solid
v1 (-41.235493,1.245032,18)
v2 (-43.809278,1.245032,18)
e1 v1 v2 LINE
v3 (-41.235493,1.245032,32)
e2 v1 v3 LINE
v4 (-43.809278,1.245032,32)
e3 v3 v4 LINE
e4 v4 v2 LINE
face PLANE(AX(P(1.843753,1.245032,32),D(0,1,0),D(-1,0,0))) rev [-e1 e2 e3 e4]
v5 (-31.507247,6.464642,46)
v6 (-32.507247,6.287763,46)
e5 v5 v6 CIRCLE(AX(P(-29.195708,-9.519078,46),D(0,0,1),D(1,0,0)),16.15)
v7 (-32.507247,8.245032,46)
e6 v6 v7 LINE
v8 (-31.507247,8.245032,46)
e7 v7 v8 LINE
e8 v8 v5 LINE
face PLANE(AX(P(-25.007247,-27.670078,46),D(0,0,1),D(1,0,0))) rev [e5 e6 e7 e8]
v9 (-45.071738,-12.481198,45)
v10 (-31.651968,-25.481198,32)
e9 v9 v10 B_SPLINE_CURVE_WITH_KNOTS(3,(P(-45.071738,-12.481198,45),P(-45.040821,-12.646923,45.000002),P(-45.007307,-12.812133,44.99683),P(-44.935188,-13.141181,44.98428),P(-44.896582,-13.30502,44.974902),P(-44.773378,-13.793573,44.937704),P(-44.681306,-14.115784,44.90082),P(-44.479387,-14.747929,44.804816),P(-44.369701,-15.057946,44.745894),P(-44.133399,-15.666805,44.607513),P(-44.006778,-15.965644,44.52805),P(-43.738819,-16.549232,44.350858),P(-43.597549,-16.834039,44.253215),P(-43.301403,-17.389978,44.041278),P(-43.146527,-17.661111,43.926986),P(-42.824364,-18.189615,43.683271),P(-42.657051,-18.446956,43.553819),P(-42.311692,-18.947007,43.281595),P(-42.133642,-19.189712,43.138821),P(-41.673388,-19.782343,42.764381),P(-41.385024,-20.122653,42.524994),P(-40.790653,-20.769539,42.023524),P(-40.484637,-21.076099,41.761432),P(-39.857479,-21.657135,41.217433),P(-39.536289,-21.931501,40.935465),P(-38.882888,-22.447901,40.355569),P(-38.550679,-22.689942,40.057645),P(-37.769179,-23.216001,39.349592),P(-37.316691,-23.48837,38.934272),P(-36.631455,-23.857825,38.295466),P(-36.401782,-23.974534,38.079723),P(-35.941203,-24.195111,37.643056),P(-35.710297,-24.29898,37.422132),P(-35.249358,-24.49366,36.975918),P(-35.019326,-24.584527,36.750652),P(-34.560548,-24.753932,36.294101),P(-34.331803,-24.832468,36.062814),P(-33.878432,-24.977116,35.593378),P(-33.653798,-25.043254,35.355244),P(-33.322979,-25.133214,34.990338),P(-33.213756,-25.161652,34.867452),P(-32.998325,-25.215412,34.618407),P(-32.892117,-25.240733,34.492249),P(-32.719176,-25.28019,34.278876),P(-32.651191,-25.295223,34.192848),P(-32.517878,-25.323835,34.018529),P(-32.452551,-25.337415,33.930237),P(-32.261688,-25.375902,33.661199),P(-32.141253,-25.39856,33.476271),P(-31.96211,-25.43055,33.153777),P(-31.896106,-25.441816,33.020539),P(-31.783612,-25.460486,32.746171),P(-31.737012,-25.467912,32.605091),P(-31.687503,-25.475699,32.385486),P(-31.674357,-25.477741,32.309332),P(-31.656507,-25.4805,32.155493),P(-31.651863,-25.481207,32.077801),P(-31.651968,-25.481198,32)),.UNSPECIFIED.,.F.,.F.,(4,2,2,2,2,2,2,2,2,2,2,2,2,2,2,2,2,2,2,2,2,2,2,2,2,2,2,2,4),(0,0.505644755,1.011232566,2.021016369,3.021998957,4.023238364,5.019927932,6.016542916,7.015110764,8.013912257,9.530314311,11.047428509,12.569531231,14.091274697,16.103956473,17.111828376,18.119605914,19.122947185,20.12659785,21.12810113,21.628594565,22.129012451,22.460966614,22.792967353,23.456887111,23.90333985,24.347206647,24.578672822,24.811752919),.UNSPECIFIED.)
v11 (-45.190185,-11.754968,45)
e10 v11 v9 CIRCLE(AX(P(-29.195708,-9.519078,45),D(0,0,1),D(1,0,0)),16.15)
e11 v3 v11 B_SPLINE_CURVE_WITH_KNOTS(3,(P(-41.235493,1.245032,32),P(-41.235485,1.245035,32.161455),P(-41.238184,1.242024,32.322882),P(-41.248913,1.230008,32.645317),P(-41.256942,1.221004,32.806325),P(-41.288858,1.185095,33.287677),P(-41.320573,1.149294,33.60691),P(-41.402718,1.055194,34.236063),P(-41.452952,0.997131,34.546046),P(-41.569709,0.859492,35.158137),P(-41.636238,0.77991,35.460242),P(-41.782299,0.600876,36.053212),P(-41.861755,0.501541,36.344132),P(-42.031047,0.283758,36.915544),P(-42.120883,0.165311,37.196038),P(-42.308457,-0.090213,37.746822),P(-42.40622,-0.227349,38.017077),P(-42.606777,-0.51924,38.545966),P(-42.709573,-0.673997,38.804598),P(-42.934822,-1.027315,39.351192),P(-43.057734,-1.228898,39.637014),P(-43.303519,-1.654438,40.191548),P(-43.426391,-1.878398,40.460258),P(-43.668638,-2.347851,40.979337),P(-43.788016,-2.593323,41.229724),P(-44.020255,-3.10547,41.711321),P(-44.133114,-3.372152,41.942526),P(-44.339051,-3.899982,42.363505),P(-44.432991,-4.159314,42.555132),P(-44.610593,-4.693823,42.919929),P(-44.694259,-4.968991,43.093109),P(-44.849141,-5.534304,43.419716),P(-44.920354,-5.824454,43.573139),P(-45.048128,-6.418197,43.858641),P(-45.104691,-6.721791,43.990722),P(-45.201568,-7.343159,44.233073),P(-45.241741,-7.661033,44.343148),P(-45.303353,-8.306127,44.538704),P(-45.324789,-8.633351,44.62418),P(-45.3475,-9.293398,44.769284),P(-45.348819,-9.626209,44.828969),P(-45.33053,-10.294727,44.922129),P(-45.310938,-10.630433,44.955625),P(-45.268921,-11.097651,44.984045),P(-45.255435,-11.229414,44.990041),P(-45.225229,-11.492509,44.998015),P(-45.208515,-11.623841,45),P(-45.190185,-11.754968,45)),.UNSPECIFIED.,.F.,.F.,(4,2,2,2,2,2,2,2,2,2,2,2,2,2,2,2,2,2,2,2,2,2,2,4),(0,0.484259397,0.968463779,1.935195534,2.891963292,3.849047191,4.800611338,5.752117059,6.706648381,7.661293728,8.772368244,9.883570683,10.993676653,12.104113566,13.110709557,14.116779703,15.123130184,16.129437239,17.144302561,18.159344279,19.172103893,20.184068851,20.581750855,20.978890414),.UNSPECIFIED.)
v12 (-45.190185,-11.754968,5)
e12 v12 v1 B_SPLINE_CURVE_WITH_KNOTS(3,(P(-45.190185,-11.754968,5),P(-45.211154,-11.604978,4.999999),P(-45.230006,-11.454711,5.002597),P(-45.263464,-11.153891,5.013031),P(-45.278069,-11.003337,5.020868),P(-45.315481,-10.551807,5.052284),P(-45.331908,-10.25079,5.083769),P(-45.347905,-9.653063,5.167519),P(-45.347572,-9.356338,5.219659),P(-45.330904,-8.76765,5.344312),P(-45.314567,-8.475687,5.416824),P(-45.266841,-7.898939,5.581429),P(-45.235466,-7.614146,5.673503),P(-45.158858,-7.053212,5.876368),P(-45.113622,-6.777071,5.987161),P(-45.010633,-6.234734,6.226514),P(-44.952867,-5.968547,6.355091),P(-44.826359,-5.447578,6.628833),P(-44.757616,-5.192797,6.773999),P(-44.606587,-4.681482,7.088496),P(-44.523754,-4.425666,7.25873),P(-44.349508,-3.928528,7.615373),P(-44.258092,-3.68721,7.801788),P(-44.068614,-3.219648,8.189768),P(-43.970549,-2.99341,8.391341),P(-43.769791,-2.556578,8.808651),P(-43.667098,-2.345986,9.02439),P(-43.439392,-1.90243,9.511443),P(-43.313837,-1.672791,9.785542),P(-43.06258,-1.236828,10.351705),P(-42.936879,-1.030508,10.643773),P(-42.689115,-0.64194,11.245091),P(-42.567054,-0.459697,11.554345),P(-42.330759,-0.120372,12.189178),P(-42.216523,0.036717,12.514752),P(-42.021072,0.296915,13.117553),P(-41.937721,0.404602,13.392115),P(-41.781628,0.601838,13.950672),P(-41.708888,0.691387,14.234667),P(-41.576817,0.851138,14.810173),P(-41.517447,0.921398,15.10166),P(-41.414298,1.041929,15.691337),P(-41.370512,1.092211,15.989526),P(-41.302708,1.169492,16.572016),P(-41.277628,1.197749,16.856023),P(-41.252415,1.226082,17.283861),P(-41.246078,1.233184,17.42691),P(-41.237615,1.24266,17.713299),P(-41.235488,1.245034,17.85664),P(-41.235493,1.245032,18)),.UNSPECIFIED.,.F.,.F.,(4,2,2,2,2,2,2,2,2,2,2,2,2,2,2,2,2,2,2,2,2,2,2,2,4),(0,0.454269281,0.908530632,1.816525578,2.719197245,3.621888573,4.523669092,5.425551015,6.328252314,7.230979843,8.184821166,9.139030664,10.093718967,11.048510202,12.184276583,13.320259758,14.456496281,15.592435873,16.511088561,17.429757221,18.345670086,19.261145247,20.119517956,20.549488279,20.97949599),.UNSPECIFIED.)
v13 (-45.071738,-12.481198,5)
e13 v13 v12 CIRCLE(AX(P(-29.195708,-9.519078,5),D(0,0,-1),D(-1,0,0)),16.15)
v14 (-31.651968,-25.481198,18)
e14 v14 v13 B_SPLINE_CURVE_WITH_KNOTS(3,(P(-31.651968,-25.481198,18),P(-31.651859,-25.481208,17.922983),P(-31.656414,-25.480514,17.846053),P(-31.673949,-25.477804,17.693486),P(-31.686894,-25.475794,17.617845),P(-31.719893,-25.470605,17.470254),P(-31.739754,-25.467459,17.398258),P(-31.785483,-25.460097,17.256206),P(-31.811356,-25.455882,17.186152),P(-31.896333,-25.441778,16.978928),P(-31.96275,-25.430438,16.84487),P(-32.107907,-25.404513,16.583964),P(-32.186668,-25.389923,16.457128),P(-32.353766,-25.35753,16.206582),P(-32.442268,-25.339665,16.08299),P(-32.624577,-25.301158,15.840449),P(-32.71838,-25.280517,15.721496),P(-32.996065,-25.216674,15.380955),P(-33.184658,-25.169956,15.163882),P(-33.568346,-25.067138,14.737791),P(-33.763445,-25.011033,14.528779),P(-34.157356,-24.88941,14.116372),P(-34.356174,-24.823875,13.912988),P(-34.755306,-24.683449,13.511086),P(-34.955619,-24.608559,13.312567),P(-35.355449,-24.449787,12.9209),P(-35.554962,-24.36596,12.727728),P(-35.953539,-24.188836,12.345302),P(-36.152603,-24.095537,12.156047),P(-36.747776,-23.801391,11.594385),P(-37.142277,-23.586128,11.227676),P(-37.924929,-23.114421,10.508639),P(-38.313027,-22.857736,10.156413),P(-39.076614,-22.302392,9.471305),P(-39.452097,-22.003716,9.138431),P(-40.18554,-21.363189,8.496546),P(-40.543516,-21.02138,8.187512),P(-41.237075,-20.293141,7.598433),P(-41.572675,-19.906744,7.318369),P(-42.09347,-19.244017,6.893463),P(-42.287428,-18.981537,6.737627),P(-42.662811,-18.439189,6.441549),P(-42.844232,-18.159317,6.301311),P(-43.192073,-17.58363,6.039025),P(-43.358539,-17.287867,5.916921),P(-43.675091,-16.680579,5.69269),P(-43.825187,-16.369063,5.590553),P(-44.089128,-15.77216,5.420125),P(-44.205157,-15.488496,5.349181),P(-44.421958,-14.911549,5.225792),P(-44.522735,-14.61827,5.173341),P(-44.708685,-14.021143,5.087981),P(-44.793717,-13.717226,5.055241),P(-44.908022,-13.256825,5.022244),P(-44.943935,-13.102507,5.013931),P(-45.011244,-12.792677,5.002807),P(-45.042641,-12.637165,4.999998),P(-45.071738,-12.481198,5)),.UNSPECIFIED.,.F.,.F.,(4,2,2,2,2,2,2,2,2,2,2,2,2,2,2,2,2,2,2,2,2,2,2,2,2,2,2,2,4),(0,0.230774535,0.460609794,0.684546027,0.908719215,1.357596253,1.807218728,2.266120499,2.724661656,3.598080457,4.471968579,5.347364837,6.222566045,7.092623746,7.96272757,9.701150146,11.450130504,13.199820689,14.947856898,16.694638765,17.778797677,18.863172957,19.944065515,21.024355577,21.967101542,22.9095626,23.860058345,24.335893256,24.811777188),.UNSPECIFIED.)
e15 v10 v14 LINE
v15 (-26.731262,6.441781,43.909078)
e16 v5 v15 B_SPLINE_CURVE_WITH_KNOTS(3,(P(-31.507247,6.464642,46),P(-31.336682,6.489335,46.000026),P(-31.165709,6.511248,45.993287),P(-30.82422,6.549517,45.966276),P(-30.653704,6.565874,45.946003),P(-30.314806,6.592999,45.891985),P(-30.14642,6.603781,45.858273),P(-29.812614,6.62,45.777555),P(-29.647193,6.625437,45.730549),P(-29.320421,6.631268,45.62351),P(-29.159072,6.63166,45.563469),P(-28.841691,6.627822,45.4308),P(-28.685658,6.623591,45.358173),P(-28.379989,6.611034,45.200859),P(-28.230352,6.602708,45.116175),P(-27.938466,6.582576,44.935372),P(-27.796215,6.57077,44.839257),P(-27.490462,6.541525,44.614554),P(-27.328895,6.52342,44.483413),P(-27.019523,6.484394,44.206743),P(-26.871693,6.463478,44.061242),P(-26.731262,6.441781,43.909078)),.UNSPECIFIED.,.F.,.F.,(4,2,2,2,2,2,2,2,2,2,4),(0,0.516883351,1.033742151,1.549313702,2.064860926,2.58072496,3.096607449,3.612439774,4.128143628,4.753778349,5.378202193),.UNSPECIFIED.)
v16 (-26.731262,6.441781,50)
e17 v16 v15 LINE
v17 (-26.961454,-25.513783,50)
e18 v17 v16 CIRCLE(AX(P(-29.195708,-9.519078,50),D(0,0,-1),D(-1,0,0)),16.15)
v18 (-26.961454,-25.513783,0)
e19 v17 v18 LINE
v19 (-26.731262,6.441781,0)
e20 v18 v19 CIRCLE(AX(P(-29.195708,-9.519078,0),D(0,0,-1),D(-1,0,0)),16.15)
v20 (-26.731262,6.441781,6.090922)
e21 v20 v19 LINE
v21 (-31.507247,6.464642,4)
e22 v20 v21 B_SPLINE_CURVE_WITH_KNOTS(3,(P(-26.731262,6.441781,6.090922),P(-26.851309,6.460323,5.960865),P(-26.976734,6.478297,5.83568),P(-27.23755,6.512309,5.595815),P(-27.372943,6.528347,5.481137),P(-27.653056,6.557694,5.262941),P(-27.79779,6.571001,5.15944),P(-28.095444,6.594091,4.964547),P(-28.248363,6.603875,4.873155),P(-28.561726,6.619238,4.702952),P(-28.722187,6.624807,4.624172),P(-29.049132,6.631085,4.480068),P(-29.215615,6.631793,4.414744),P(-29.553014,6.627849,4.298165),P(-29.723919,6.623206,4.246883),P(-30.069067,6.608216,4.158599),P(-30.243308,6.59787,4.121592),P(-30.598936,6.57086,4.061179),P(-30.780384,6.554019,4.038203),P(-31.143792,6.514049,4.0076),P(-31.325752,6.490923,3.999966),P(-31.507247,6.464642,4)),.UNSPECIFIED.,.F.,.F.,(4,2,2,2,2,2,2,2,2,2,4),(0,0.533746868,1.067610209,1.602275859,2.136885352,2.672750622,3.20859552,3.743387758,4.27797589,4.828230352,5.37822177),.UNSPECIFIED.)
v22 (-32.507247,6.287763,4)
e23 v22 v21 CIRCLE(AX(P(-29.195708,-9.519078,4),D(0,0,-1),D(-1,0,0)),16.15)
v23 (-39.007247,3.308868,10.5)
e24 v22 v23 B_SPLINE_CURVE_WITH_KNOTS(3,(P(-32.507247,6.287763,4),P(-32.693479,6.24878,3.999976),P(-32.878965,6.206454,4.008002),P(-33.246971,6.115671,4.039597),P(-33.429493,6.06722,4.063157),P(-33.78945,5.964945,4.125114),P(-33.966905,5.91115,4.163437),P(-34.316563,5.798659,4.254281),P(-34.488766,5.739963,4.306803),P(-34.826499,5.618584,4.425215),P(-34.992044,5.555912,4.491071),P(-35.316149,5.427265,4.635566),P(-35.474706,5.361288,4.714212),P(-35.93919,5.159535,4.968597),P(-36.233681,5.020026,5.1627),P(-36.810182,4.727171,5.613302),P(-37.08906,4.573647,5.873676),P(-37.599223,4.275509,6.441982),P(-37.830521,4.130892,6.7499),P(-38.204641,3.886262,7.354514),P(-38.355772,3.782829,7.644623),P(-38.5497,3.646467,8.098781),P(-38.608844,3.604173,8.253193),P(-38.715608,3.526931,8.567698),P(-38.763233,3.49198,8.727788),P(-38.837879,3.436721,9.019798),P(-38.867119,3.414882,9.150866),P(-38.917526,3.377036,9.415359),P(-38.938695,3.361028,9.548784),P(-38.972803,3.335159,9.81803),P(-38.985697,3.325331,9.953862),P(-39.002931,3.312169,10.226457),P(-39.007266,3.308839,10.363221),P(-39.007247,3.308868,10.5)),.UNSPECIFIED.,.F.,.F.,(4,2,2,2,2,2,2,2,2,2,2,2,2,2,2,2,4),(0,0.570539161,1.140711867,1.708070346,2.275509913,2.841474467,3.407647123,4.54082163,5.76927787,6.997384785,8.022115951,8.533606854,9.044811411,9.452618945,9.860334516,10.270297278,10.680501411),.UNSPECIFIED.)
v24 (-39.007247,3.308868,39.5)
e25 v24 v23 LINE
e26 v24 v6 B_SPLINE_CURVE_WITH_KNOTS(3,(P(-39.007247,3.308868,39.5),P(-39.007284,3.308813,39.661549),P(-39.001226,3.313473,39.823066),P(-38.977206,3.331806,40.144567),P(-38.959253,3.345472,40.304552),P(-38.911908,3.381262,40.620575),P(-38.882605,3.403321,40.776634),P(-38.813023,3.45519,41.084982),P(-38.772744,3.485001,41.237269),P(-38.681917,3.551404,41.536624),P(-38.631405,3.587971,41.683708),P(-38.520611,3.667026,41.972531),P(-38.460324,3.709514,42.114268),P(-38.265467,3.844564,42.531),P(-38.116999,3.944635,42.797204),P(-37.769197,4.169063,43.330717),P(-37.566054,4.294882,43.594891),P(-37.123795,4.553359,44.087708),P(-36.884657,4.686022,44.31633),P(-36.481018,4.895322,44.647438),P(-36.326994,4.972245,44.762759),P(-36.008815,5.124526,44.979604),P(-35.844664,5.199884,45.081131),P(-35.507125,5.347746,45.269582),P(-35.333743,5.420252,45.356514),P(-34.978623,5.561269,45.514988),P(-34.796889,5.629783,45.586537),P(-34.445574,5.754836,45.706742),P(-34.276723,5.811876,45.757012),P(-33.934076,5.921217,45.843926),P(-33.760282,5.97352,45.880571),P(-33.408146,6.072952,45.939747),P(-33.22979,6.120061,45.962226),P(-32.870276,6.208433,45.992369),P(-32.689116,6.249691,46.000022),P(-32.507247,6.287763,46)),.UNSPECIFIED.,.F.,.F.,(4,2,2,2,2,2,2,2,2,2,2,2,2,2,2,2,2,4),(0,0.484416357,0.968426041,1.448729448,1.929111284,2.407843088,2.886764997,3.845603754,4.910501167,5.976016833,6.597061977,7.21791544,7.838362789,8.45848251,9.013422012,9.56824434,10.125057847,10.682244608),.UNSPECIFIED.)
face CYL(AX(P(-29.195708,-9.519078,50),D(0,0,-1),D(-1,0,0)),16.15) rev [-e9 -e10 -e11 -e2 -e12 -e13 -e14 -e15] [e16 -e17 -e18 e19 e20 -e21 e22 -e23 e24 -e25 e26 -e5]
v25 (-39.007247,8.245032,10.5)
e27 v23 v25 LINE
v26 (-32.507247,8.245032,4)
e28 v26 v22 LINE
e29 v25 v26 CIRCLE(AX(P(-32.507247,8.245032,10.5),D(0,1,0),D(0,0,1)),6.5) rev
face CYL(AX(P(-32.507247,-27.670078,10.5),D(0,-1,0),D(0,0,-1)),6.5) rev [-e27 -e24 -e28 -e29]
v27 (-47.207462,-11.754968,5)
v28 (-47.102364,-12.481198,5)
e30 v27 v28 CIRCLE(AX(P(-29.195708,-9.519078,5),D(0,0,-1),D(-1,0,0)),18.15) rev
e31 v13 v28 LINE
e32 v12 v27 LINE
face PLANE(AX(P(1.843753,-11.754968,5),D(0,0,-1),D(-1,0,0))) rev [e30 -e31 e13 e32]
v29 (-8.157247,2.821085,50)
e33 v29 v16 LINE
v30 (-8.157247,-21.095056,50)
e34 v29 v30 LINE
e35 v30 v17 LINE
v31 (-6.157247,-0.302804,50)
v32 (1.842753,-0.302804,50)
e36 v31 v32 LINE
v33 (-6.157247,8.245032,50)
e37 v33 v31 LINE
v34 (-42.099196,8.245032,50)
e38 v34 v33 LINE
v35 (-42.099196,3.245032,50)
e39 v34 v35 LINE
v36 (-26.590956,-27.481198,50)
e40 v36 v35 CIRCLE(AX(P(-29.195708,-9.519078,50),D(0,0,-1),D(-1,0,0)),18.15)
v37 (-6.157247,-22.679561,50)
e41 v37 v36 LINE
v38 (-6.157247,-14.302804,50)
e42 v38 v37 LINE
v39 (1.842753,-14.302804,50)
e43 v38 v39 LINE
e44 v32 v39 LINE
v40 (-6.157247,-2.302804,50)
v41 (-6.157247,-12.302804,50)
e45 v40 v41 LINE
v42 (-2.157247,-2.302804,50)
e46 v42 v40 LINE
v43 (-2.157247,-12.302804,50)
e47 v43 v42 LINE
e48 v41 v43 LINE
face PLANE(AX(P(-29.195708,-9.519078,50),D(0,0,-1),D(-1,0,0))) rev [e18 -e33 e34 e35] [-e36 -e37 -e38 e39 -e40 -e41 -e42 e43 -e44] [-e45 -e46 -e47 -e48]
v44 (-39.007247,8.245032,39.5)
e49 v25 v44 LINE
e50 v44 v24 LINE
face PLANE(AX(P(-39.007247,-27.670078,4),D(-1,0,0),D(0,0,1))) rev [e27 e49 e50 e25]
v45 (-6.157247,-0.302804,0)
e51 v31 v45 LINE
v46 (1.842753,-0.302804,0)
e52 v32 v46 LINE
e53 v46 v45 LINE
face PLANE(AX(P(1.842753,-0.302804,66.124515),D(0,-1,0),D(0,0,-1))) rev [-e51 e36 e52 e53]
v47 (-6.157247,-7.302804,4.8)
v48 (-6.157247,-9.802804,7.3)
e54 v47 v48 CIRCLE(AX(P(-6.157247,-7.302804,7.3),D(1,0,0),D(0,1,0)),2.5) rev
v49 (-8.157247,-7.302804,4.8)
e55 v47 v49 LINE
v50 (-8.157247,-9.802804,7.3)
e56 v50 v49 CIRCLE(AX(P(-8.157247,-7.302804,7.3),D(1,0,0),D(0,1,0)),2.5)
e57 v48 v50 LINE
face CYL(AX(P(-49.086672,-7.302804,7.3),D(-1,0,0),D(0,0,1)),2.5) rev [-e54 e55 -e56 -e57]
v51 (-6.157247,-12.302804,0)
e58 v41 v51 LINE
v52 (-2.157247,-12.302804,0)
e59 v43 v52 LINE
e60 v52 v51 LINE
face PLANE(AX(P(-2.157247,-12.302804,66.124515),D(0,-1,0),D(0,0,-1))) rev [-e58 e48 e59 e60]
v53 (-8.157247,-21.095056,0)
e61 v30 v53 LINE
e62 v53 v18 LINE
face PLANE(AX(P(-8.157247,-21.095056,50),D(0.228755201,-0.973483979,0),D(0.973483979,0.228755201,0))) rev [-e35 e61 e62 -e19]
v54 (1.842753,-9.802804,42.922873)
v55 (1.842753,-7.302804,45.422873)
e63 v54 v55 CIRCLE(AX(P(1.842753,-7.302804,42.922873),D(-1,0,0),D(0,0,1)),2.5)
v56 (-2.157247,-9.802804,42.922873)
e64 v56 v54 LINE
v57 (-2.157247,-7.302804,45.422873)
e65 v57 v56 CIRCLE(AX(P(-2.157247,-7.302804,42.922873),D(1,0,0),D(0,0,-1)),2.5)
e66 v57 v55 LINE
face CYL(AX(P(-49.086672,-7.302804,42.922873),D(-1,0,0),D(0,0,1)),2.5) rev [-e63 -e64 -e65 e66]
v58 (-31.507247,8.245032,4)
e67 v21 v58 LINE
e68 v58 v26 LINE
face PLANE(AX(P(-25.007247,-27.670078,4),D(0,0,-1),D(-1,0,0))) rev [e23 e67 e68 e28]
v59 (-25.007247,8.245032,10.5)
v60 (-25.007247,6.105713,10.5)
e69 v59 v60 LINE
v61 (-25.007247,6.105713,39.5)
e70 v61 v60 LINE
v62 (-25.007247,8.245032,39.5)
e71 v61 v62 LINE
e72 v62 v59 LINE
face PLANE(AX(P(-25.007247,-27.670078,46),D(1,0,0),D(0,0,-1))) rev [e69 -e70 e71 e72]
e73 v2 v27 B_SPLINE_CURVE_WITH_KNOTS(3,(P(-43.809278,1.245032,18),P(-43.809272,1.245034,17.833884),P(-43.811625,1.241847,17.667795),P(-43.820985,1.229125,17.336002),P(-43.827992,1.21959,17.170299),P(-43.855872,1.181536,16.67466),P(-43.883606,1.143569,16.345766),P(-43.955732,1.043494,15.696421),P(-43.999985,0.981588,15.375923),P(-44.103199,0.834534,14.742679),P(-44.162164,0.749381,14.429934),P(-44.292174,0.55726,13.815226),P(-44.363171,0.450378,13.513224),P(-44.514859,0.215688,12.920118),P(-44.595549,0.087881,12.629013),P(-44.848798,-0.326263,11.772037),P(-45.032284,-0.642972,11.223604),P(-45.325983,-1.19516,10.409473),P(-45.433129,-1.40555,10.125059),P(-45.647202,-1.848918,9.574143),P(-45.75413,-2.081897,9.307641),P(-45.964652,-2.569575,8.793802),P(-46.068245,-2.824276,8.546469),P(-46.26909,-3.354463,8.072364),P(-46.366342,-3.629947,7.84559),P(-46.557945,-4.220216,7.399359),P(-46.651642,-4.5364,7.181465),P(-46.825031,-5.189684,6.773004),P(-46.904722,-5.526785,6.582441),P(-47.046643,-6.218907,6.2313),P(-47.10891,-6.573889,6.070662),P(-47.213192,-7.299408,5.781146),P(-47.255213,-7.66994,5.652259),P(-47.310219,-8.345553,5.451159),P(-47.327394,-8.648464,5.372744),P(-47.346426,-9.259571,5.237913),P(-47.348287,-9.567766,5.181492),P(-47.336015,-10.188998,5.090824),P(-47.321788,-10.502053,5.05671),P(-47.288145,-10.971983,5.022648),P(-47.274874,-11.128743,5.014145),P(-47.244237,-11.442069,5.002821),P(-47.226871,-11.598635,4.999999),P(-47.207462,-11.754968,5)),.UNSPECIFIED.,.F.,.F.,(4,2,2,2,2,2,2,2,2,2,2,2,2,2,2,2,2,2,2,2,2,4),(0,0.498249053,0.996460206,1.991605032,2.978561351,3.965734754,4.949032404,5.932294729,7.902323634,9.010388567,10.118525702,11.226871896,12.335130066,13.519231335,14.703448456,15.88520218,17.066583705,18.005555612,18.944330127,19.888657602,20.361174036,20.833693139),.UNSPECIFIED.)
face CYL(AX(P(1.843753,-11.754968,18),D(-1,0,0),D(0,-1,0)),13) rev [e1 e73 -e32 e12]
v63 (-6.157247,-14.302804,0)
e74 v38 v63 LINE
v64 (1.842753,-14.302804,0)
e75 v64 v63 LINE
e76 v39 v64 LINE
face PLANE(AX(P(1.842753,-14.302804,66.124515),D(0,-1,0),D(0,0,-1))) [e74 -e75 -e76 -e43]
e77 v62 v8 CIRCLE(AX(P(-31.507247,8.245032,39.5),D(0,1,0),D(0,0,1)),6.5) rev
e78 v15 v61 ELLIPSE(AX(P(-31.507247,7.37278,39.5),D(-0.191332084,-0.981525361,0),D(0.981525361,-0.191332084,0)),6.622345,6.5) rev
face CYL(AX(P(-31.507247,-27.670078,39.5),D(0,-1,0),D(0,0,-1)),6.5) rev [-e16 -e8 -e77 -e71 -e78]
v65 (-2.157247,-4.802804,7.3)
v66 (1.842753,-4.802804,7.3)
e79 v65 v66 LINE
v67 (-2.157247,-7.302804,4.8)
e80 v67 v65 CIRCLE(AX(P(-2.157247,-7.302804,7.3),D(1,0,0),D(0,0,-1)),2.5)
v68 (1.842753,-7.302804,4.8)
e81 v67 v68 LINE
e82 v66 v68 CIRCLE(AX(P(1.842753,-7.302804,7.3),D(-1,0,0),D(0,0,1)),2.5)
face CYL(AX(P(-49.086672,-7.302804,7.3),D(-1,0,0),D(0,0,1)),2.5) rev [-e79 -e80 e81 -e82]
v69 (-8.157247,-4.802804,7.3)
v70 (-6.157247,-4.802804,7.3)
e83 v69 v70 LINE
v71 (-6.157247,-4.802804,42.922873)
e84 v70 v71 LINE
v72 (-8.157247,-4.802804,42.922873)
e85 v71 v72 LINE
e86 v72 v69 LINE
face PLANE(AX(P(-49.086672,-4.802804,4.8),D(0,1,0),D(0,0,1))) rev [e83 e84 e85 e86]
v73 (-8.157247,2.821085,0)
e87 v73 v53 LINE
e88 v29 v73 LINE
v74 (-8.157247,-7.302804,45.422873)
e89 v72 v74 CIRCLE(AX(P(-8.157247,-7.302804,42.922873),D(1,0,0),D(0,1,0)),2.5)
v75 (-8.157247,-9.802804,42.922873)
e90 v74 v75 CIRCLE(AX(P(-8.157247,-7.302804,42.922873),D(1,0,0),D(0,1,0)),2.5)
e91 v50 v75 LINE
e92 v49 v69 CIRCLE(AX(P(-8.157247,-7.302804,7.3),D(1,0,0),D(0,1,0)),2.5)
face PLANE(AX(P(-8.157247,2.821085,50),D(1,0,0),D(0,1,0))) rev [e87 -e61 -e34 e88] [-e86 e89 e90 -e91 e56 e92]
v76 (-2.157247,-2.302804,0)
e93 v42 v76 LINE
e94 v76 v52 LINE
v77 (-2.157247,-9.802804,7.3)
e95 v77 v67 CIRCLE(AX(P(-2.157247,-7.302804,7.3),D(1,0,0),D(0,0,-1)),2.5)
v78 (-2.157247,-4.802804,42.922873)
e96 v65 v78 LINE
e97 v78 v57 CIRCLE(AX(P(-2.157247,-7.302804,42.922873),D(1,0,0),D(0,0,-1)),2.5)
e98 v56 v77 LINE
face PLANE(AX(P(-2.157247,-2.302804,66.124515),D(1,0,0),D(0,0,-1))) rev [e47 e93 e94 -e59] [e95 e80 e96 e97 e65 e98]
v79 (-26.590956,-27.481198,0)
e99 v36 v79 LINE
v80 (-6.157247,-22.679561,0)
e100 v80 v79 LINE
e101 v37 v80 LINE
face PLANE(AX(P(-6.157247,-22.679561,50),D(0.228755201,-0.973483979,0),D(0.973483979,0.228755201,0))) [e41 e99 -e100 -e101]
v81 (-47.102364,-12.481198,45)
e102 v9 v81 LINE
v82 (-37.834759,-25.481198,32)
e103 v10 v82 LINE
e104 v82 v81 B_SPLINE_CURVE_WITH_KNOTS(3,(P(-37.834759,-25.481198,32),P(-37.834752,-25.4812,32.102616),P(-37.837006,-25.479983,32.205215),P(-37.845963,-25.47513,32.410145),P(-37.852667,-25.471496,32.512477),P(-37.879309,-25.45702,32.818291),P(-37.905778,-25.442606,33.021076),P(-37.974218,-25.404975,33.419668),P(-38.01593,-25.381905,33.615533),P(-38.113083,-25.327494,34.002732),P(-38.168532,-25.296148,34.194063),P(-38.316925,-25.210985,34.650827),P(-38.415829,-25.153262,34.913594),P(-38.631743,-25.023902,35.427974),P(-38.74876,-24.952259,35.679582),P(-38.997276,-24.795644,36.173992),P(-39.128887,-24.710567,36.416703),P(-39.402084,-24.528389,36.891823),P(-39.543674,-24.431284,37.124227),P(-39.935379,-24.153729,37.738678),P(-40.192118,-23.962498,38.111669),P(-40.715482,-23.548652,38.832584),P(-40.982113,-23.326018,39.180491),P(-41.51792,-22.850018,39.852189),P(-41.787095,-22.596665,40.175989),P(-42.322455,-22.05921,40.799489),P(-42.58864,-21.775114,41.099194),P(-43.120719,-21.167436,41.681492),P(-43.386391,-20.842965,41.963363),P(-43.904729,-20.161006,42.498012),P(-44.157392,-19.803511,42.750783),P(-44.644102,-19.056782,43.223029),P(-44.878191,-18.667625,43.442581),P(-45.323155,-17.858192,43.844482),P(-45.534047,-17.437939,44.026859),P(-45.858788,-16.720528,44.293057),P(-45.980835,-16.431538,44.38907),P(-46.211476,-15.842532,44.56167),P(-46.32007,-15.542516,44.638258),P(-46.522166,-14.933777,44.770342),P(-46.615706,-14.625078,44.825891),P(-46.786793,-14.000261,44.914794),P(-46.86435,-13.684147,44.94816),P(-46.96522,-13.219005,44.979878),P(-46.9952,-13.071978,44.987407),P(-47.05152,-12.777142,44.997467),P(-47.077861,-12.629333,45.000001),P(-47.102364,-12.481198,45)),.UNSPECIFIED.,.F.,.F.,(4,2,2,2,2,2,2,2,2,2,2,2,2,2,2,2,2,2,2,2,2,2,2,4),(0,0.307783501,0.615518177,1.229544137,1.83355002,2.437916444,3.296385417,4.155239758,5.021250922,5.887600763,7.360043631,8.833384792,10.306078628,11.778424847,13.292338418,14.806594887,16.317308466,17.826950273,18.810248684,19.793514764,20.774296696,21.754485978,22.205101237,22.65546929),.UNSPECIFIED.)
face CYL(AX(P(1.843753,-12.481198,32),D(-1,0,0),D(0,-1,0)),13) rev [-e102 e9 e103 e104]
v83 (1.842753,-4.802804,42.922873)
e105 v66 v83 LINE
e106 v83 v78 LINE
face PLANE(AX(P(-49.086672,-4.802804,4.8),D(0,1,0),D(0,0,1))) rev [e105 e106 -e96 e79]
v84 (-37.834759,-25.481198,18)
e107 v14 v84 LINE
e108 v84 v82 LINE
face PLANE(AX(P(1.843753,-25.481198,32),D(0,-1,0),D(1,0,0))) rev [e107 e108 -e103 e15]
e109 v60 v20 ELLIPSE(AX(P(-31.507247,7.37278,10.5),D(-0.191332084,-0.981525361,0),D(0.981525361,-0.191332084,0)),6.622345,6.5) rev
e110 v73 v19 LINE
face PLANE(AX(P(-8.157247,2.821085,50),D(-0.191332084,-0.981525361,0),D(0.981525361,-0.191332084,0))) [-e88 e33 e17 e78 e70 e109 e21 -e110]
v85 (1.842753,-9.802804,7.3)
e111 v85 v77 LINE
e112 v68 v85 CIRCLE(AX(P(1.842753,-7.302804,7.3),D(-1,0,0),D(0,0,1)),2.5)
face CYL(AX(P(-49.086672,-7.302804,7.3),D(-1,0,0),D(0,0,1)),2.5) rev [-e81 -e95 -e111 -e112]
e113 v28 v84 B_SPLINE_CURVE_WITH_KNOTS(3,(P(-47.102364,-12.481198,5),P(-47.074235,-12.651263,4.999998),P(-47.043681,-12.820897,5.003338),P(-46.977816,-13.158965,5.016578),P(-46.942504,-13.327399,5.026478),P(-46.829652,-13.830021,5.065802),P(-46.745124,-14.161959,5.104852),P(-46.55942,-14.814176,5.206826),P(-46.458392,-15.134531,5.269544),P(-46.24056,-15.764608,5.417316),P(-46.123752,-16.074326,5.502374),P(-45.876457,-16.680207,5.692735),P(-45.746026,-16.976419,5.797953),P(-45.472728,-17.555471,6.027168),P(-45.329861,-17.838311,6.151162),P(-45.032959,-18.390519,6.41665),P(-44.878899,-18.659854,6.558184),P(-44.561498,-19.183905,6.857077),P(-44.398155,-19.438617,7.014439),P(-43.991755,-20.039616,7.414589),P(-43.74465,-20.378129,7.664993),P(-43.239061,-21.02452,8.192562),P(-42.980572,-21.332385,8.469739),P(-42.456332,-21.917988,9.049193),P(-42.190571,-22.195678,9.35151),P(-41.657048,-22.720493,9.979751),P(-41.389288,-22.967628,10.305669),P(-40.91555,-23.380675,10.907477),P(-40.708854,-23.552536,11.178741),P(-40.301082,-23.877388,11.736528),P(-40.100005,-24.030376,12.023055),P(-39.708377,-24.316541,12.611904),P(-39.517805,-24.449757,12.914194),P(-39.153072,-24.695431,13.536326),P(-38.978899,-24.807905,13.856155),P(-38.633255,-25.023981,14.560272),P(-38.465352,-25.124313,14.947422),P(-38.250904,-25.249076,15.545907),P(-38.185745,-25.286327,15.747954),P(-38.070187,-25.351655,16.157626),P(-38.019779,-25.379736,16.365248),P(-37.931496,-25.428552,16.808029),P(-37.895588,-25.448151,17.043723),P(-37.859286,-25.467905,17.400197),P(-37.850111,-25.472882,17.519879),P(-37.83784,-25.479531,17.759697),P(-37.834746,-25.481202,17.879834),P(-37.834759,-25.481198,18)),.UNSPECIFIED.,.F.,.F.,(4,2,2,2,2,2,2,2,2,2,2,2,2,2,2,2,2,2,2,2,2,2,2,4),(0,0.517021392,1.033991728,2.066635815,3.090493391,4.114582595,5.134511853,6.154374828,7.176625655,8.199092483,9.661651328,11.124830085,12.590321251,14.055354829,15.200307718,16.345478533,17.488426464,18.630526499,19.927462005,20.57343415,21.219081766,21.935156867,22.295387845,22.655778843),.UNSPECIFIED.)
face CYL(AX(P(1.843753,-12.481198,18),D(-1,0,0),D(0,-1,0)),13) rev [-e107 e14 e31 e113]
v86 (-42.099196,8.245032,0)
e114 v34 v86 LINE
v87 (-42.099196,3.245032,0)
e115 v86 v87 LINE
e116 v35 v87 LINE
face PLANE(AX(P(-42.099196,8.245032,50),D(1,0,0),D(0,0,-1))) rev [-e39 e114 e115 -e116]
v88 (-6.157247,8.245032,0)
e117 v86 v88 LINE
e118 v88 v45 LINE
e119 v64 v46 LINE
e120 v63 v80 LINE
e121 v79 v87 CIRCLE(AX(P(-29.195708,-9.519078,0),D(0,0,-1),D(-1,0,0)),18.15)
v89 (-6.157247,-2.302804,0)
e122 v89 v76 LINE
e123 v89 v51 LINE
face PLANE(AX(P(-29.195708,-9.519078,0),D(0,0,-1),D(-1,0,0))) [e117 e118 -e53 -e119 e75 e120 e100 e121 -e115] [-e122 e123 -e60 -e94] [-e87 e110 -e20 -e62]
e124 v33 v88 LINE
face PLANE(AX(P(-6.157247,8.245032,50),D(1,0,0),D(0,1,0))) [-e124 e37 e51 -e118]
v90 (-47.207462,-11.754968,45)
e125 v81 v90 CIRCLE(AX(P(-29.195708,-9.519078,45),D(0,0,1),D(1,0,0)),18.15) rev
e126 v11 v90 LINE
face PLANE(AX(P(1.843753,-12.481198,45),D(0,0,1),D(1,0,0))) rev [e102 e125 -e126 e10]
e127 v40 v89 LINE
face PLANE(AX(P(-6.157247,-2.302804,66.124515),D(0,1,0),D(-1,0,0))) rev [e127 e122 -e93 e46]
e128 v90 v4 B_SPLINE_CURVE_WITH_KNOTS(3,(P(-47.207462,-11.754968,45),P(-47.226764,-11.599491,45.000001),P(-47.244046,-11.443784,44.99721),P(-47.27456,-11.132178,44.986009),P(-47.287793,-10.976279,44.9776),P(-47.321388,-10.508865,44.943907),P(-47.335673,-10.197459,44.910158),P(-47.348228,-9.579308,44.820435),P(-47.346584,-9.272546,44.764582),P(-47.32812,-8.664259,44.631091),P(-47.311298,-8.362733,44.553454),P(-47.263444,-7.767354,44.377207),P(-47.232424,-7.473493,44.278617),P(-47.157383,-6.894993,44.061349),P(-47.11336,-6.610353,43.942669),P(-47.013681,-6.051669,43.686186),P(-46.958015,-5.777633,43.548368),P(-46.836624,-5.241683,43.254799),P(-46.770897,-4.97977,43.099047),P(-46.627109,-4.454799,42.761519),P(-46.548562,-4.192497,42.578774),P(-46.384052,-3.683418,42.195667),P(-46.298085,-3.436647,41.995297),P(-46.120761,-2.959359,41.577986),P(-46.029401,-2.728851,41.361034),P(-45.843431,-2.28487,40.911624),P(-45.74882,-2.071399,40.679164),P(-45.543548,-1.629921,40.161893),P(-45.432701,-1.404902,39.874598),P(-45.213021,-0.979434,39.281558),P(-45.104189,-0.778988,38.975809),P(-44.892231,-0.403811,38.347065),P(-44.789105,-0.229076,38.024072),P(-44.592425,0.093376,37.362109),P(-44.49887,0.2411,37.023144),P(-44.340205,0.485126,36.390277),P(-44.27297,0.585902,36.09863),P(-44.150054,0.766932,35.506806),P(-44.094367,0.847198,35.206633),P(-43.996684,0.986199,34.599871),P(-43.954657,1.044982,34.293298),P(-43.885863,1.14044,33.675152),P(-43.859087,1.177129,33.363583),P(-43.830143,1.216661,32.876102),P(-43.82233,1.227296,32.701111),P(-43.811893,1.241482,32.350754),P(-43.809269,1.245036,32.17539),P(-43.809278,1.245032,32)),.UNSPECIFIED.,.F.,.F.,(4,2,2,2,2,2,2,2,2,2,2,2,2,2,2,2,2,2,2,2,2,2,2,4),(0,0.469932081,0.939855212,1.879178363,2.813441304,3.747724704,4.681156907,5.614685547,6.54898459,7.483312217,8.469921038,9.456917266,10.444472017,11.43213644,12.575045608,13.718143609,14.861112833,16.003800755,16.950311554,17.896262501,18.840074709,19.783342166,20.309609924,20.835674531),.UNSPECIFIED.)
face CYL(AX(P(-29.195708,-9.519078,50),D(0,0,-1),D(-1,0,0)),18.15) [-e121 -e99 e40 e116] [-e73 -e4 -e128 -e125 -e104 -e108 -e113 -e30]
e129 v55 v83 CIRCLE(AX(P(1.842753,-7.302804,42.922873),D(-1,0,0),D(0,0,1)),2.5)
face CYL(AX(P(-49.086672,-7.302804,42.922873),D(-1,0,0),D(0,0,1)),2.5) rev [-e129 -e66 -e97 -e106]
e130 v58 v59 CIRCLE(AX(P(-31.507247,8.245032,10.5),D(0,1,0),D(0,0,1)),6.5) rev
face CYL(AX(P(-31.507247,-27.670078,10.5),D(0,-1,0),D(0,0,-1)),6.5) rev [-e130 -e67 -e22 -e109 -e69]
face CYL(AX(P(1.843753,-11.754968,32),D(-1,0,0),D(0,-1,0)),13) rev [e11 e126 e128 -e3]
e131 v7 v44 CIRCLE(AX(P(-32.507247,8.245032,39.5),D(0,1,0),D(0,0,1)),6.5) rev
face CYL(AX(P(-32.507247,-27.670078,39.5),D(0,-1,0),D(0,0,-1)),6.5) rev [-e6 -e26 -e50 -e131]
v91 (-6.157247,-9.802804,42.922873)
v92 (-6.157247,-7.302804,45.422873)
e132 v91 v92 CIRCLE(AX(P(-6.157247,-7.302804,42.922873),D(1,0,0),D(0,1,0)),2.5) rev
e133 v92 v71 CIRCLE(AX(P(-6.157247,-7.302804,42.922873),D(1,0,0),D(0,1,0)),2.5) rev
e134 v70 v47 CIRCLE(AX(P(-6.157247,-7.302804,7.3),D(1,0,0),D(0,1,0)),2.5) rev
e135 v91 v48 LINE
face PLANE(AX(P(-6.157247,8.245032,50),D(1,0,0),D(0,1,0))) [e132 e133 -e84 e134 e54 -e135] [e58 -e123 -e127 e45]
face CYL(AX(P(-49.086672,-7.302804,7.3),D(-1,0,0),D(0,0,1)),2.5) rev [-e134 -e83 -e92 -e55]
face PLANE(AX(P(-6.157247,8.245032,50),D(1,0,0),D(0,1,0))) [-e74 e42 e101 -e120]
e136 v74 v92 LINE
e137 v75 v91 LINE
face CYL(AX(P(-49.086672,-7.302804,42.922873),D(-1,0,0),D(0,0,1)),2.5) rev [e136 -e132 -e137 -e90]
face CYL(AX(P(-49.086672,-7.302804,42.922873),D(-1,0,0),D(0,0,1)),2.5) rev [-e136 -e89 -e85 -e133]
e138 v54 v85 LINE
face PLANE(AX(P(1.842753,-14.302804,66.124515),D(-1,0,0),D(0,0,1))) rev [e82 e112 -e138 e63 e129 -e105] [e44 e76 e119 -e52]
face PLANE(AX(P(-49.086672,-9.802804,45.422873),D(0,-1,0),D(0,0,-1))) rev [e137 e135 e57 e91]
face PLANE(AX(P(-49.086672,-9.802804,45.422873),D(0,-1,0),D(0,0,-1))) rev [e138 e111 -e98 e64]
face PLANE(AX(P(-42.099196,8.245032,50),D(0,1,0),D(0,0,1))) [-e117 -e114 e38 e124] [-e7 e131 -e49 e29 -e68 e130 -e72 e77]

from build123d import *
from OCP.BRepAlgoAPI import BRepAlgoAPI_Cut
from OCP.TopTools import TopTools_ListOfShape

# Parameters (mm, degrees)
SALIENTE_EXTRUIR1_DEPTH     = 50
SALIENTE_EXTRUIR2_DEPTH     = 50
CORTAR_EXTRUIR12_REACH      = 77.399
REDONDEO1_R                 = 2.5
CORTAR_EXTRUIR17_REACH      = 77.931
CORTAR_EXTRUIR17_END_RADIUS = 16.15
CORTAR_EXTRUIR19_REACH      = 79.662
CROQUIS18_W                 = 7
CROQUIS18_H                 = 42
CORTAR_EXTRUIR22_REACH      = 79.662
CORTAR_EXTRUIR22_END_RADIUS = 16.15
CROQUIS22_W                 = 7
CROQUIS22_H                 = 42
REDONDEO10_START            = 3.308867588
REDONDEO10_DEPTH            = 4.936164621
REDONDEO10_START_2          = 6.105712769
REDONDEO10_2_DEPTH          = 2.13931944
REDONDEO10_START_3          = 4
REDONDEO10_3_DEPTH          = 42


with BuildPart() as part:
    # Croquis3 → Saliente-Extruir1 (new body)
    with BuildSketch(Plane.XY):
        with BuildLine():
            Line((-42.099195701, 8.245032209), (-6.157247249, 8.245032209))
            Line((-6.157247249, 8.245032209), (-6.157247249, -22.679560551))
            Line((-6.157247249, -22.679560551), (-26.590955846, -27.481197975))
            ThreePointArc((-26.590955846, -27.481197975), (-45.398833914, -17.697170572), (-42.099195701, 3.245032209))
            Line((-42.099195701, 3.245032209), (-42.099195701, 8.245032209))
        make_face()
        with BuildLine():
            Line((-8.157247249, 2.82108494), (-26.731262437, 6.441781026))
            ThreePointArc((-26.731262437, 6.441781026), (-45.345288804, -9.402744466), (-26.961453667, -25.513783269))
            Line((-26.961453667, -25.513783269), (-8.157247249, -21.095056202))
            Line((-8.157247249, -21.095056202), (-8.157247249, 2.82108494))
        make_face(mode=Mode.SUBTRACT)
    extrude(amount=SALIENTE_EXTRUIR1_DEPTH)

    # Croquis11 → Saliente-Extruir2 (add)
    with BuildSketch(Plane(origin=(0, 0, 0), x_dir=(-1, 0, 0), z_dir=(0, 0, -1))):
        Polygon((-1.842752751, -14.302804028), (-1.842752751, -0.302804028), (6.157247249, -0.302804028), (6.157247249, -2.302804028), (2.157247249, -2.302804028), (2.157247249, -12.302804028), (6.157247249, -12.302804028), (6.157247249, -14.302804028), align=None)
    extrude(amount=-SALIENTE_EXTRUIR2_DEPTH)

    # Cortar-Extruir12: up to this face of the body (flat: up to its plane)
    cortar_extruir12_end = Plane(part.part.faces().sort_by_distance((-8.157247249, -9.136985631, 25))[0])
    # Croquis12 → Cortar-Extruir12 (cut, up to the picked face)
    with BuildSketch(Plane(origin=(1.842752751, 0, 0), x_dir=(0, 0, -1), z_dir=(1, 0, 0)), mode=Mode.PRIVATE) as cortar_extruir12_sk1:
        Polygon((-25, -9.802804028), (-4.8, -9.802804028), (-4.8, -4.802804028), (-45.42287301, -4.802804028), (-45.42287301, -9.802804028), align=None)
    cortar_extruir12_tool1 = split(extrude(cortar_extruir12_sk1.sketch, amount=-CORTAR_EXTRUIR12_REACH, mode=Mode.PRIVATE), bisect_by=cortar_extruir12_end, keep=Keep.BOTH, mode=Mode.PRIVATE)
    add(cortar_extruir12_tool1.solids().sort_by(Axis((1.842753, -7.302804, 25.111437), (-1, 0, 0)))[0], mode=Mode.SUBTRACT)

    # Redondeo1
    redondeo1_edges = [part.edges().sort_by_distance(p)[0] for p in [
        (-0.157247249, -4.802804028, 4.8),
        (-0.157247249, -9.802804028, 4.8),
        (-0.157247249, -9.802804028, 45.42287301),
        (-0.157247249, -4.802804028, 45.42287301),
        (-7.157247249, -9.802804028, 4.8),
        (-7.157247249, -4.802804028, 4.8),
        (-7.157247249, -9.802804028, 45.42287301),
        (-7.157247249, -4.802804028, 45.42287301),
    ]]
    fillet(redondeo1_edges, radius=REDONDEO1_R - 0.0001)  # a hair under: the kernel refuses the full size

    # Cortar-Extruir17: up to this cylinder (the profile starts outside it)
    cortar_extruir17_end = Plane(origin=(-29.1957078, -9.519077631, 25), z_dir=(0, 0, -1)) * Cylinder(CORTAR_EXTRUIR17_END_RADIUS, 189.162, mode=Mode.PRIVATE)
    # Croquis16 → Cortar-Extruir17 (cut, up to the surface)
    with BuildSketch(Plane.ZY.offset(48.157247249), mode=Mode.PRIVATE) as cortar_extruir17_sk1:
        with BuildLine():
            Line((32, -25.481197975), (18, -25.481197975))
            ThreePointArc((18, -25.481197975), (8.807611845, -21.67358613), (5, -12.481197975))
            Line((5, -12.481197975), (5, -11.754967791))
            ThreePointArc((5, -11.754967791), (8.807611845, -2.562579636), (18, 1.245032209))
            Line((18, 1.245032209), (32, 1.245032209))
            ThreePointArc((32, 1.245032209), (41.192388155, -2.562579636), (45, -11.754967791))
            Line((45, -11.754967791), (45, -12.481197975))
            ThreePointArc((45, -12.481197975), (41.192388155, -21.67358613), (32, -25.481197975))
        make_face()
    cortar_extruir17_tool1 = extrude(cortar_extruir17_sk1.sketch, amount=-CORTAR_EXTRUIR17_REACH, mode=Mode.PRIVATE) - cortar_extruir17_end
    add(cortar_extruir17_tool1.solids().sort_by_distance((-48.157247, -12.118083, 25))[0], mode=Mode.SUBTRACT)

    # Croquis18 → Cortar-Extruir19 (cut, up to next)
    with BuildSketch(Plane(origin=(0, 8.245032209, 0), x_dir=(1, 0, 0), z_dir=(0, 1, 0)), mode=Mode.PRIVATE) as cortar_extruir19_sk1:
        with Locations((-28.507247249, -25)):
            Rectangle(CROQUIS18_W, CROQUIS18_H)
    cortar_extruir19_tool1 = extrude(cortar_extruir19_sk1.sketch, amount=-CORTAR_EXTRUIR19_REACH, mode=Mode.PRIVATE) & part.part
    add(cortar_extruir19_tool1.solids().sort_by_distance((-28.507247, 8.245032, 25))[0], mode=Mode.SUBTRACT)

    # Cortar-Extruir22: up to this cylinder (the profile starts outside it)
    cortar_extruir22_end = Plane(origin=(-29.1957078, -9.519077631, 25), z_dir=(0, 0, -1)) * Cylinder(CORTAR_EXTRUIR22_END_RADIUS, 192.624, mode=Mode.PRIVATE)
    # Croquis22 → Cortar-Extruir22 (cut, up to the surface)
    with BuildSketch(Plane(origin=(0, 8.245032209, 0), x_dir=(1, 0, 0), z_dir=(0, 1, 0)), mode=Mode.PRIVATE) as cortar_extruir22_sk1:
        with Locations((-35.507247249, -25)):
            Rectangle(CROQUIS22_W, CROQUIS22_H)
    cortar_extruir22_tool1 = extrude(cortar_extruir22_sk1.sketch, amount=-CORTAR_EXTRUIR22_REACH, mode=Mode.PRIVATE) - cortar_extruir22_end
    add(cortar_extruir22_tool1.solids().sort_by_distance((-35.507247, 8.245032, 25))[0], mode=Mode.SUBTRACT)


with BuildPart() as redondeo10_tool:
    # Redondeo10: read off the stored shape, not the designer's step
    # Redondeo10 outline → Redondeo10 (new body)
    with BuildSketch(Plane(origin=(0, 0, 0), x_dir=(1, 0, 0), z_dir=(0, 1, 0)).offset(REDONDEO10_START)):
        with BuildLine():
            Line((-39.007247249, -4), (-39.007247249, -10.5))
            ThreePointArc((-39.007247249, -10.5), (-37.103441327, -5.903805922), (-32.507247249, -4))
            Line((-32.507247249, -4), (-39.007247249, -4))
        make_face()
        with BuildLine():
            ThreePointArc((-32.507247249, -46), (-37.103441327, -44.096194078), (-39.007247249, -39.5))
            Line((-39.007247249, -39.5), (-39.007247249, -46))
            Line((-39.007247249, -46), (-32.507247249, -46))
        make_face()
    extrude(amount=REDONDEO10_DEPTH)


with BuildPart() as part_1:
    add(part.part)


with BuildPart() as part_2:
    # Redondeo10: joined with redondeo10_tool
    add(part_1.part.fuse(redondeo10_tool.part, tol=0.00001))


with BuildPart() as redondeo10_2_tool:
    # Redondeo10 2 outline → Redondeo10 2 (new body)
    with BuildSketch(Plane(origin=(0, 0, 0), x_dir=(1, 0, 0), z_dir=(0, 1, 0)).offset(REDONDEO10_START_2)):
        with BuildLine():
            Line((-25.007247249, -4), (-31.507247249, -4))
            ThreePointArc((-31.507247249, -4), (-26.911053171, -5.903805922), (-25.007247249, -10.5))
            Line((-25.007247249, -10.5), (-25.007247249, -4))
        make_face()
        with BuildLine():
            ThreePointArc((-25.007247249, -39.5), (-26.911053171, -44.096194078), (-31.507247249, -46))
            Line((-31.507247249, -46), (-25.007247249, -46))
            Line((-25.007247249, -46), (-25.007247249, -39.5))
        make_face()
    extrude(amount=REDONDEO10_2_DEPTH)


with BuildPart() as part_3:
    add(part_2.part)


with BuildPart() as part_4:
    # Redondeo10 2: joined with redondeo10_2_tool
    add(part_3.part.fuse(redondeo10_2_tool.part, tol=0.00001))


with BuildPart() as redondeo10_3_tool:
    # Redondeo10 3 outline → Redondeo10 3 (new body)
    with BuildSketch(Plane.XY.offset(REDONDEO10_START_3)):
        with BuildLine():
            Line((-39.007247249, 3.308868177), (-32.507247249, 3.308867588))
            Line((-32.507247249, 3.308867588), (-32.507247249, 6.287762866))
            ThreePointArc((-32.507247249, 6.287762866), (-35.924173697, 5.162551934), (-39.007247249, 3.308868177))
        make_face()
        with BuildLine():
            Line((-31.507247249, 6.105712769), (-25.007247249, 6.105712769))
            Line((-25.007247249, 6.105712769), (-26.731262437, 6.441781026))
            ThreePointArc((-26.731262437, 6.441781026), (-29.118405097, 6.630737362), (-31.507247249, 6.464641754))
            Line((-31.507247249, 6.464641754), (-31.507247249, 6.105712769))
        make_face()
    extrude(amount=REDONDEO10_3_DEPTH)


with BuildPart() as part_5:
    add(part_4.part)

    # Redondeo10 3: cut by redondeo10_3_tool, with a tolerance
    redondeo10_3_stock = TopTools_ListOfShape()
    redondeo10_3_stock.Append(part_5.part.wrapped)
    redondeo10_3_tools = TopTools_ListOfShape()
    redondeo10_3_tools.Append(redondeo10_3_tool.part.wrapped)
    redondeo10_3_cut = BRepAlgoAPI_Cut()
    redondeo10_3_cut.SetArguments(redondeo10_3_stock)
    redondeo10_3_cut.SetTools(redondeo10_3_tools)
    redondeo10_3_cut.SetFuzzyValue(0.00001)
    redondeo10_3_cut.Build()
    add(Compound.cast(redondeo10_3_cut.Shape()).solids(), mode=Mode.REPLACE)


solid = part_5.part
